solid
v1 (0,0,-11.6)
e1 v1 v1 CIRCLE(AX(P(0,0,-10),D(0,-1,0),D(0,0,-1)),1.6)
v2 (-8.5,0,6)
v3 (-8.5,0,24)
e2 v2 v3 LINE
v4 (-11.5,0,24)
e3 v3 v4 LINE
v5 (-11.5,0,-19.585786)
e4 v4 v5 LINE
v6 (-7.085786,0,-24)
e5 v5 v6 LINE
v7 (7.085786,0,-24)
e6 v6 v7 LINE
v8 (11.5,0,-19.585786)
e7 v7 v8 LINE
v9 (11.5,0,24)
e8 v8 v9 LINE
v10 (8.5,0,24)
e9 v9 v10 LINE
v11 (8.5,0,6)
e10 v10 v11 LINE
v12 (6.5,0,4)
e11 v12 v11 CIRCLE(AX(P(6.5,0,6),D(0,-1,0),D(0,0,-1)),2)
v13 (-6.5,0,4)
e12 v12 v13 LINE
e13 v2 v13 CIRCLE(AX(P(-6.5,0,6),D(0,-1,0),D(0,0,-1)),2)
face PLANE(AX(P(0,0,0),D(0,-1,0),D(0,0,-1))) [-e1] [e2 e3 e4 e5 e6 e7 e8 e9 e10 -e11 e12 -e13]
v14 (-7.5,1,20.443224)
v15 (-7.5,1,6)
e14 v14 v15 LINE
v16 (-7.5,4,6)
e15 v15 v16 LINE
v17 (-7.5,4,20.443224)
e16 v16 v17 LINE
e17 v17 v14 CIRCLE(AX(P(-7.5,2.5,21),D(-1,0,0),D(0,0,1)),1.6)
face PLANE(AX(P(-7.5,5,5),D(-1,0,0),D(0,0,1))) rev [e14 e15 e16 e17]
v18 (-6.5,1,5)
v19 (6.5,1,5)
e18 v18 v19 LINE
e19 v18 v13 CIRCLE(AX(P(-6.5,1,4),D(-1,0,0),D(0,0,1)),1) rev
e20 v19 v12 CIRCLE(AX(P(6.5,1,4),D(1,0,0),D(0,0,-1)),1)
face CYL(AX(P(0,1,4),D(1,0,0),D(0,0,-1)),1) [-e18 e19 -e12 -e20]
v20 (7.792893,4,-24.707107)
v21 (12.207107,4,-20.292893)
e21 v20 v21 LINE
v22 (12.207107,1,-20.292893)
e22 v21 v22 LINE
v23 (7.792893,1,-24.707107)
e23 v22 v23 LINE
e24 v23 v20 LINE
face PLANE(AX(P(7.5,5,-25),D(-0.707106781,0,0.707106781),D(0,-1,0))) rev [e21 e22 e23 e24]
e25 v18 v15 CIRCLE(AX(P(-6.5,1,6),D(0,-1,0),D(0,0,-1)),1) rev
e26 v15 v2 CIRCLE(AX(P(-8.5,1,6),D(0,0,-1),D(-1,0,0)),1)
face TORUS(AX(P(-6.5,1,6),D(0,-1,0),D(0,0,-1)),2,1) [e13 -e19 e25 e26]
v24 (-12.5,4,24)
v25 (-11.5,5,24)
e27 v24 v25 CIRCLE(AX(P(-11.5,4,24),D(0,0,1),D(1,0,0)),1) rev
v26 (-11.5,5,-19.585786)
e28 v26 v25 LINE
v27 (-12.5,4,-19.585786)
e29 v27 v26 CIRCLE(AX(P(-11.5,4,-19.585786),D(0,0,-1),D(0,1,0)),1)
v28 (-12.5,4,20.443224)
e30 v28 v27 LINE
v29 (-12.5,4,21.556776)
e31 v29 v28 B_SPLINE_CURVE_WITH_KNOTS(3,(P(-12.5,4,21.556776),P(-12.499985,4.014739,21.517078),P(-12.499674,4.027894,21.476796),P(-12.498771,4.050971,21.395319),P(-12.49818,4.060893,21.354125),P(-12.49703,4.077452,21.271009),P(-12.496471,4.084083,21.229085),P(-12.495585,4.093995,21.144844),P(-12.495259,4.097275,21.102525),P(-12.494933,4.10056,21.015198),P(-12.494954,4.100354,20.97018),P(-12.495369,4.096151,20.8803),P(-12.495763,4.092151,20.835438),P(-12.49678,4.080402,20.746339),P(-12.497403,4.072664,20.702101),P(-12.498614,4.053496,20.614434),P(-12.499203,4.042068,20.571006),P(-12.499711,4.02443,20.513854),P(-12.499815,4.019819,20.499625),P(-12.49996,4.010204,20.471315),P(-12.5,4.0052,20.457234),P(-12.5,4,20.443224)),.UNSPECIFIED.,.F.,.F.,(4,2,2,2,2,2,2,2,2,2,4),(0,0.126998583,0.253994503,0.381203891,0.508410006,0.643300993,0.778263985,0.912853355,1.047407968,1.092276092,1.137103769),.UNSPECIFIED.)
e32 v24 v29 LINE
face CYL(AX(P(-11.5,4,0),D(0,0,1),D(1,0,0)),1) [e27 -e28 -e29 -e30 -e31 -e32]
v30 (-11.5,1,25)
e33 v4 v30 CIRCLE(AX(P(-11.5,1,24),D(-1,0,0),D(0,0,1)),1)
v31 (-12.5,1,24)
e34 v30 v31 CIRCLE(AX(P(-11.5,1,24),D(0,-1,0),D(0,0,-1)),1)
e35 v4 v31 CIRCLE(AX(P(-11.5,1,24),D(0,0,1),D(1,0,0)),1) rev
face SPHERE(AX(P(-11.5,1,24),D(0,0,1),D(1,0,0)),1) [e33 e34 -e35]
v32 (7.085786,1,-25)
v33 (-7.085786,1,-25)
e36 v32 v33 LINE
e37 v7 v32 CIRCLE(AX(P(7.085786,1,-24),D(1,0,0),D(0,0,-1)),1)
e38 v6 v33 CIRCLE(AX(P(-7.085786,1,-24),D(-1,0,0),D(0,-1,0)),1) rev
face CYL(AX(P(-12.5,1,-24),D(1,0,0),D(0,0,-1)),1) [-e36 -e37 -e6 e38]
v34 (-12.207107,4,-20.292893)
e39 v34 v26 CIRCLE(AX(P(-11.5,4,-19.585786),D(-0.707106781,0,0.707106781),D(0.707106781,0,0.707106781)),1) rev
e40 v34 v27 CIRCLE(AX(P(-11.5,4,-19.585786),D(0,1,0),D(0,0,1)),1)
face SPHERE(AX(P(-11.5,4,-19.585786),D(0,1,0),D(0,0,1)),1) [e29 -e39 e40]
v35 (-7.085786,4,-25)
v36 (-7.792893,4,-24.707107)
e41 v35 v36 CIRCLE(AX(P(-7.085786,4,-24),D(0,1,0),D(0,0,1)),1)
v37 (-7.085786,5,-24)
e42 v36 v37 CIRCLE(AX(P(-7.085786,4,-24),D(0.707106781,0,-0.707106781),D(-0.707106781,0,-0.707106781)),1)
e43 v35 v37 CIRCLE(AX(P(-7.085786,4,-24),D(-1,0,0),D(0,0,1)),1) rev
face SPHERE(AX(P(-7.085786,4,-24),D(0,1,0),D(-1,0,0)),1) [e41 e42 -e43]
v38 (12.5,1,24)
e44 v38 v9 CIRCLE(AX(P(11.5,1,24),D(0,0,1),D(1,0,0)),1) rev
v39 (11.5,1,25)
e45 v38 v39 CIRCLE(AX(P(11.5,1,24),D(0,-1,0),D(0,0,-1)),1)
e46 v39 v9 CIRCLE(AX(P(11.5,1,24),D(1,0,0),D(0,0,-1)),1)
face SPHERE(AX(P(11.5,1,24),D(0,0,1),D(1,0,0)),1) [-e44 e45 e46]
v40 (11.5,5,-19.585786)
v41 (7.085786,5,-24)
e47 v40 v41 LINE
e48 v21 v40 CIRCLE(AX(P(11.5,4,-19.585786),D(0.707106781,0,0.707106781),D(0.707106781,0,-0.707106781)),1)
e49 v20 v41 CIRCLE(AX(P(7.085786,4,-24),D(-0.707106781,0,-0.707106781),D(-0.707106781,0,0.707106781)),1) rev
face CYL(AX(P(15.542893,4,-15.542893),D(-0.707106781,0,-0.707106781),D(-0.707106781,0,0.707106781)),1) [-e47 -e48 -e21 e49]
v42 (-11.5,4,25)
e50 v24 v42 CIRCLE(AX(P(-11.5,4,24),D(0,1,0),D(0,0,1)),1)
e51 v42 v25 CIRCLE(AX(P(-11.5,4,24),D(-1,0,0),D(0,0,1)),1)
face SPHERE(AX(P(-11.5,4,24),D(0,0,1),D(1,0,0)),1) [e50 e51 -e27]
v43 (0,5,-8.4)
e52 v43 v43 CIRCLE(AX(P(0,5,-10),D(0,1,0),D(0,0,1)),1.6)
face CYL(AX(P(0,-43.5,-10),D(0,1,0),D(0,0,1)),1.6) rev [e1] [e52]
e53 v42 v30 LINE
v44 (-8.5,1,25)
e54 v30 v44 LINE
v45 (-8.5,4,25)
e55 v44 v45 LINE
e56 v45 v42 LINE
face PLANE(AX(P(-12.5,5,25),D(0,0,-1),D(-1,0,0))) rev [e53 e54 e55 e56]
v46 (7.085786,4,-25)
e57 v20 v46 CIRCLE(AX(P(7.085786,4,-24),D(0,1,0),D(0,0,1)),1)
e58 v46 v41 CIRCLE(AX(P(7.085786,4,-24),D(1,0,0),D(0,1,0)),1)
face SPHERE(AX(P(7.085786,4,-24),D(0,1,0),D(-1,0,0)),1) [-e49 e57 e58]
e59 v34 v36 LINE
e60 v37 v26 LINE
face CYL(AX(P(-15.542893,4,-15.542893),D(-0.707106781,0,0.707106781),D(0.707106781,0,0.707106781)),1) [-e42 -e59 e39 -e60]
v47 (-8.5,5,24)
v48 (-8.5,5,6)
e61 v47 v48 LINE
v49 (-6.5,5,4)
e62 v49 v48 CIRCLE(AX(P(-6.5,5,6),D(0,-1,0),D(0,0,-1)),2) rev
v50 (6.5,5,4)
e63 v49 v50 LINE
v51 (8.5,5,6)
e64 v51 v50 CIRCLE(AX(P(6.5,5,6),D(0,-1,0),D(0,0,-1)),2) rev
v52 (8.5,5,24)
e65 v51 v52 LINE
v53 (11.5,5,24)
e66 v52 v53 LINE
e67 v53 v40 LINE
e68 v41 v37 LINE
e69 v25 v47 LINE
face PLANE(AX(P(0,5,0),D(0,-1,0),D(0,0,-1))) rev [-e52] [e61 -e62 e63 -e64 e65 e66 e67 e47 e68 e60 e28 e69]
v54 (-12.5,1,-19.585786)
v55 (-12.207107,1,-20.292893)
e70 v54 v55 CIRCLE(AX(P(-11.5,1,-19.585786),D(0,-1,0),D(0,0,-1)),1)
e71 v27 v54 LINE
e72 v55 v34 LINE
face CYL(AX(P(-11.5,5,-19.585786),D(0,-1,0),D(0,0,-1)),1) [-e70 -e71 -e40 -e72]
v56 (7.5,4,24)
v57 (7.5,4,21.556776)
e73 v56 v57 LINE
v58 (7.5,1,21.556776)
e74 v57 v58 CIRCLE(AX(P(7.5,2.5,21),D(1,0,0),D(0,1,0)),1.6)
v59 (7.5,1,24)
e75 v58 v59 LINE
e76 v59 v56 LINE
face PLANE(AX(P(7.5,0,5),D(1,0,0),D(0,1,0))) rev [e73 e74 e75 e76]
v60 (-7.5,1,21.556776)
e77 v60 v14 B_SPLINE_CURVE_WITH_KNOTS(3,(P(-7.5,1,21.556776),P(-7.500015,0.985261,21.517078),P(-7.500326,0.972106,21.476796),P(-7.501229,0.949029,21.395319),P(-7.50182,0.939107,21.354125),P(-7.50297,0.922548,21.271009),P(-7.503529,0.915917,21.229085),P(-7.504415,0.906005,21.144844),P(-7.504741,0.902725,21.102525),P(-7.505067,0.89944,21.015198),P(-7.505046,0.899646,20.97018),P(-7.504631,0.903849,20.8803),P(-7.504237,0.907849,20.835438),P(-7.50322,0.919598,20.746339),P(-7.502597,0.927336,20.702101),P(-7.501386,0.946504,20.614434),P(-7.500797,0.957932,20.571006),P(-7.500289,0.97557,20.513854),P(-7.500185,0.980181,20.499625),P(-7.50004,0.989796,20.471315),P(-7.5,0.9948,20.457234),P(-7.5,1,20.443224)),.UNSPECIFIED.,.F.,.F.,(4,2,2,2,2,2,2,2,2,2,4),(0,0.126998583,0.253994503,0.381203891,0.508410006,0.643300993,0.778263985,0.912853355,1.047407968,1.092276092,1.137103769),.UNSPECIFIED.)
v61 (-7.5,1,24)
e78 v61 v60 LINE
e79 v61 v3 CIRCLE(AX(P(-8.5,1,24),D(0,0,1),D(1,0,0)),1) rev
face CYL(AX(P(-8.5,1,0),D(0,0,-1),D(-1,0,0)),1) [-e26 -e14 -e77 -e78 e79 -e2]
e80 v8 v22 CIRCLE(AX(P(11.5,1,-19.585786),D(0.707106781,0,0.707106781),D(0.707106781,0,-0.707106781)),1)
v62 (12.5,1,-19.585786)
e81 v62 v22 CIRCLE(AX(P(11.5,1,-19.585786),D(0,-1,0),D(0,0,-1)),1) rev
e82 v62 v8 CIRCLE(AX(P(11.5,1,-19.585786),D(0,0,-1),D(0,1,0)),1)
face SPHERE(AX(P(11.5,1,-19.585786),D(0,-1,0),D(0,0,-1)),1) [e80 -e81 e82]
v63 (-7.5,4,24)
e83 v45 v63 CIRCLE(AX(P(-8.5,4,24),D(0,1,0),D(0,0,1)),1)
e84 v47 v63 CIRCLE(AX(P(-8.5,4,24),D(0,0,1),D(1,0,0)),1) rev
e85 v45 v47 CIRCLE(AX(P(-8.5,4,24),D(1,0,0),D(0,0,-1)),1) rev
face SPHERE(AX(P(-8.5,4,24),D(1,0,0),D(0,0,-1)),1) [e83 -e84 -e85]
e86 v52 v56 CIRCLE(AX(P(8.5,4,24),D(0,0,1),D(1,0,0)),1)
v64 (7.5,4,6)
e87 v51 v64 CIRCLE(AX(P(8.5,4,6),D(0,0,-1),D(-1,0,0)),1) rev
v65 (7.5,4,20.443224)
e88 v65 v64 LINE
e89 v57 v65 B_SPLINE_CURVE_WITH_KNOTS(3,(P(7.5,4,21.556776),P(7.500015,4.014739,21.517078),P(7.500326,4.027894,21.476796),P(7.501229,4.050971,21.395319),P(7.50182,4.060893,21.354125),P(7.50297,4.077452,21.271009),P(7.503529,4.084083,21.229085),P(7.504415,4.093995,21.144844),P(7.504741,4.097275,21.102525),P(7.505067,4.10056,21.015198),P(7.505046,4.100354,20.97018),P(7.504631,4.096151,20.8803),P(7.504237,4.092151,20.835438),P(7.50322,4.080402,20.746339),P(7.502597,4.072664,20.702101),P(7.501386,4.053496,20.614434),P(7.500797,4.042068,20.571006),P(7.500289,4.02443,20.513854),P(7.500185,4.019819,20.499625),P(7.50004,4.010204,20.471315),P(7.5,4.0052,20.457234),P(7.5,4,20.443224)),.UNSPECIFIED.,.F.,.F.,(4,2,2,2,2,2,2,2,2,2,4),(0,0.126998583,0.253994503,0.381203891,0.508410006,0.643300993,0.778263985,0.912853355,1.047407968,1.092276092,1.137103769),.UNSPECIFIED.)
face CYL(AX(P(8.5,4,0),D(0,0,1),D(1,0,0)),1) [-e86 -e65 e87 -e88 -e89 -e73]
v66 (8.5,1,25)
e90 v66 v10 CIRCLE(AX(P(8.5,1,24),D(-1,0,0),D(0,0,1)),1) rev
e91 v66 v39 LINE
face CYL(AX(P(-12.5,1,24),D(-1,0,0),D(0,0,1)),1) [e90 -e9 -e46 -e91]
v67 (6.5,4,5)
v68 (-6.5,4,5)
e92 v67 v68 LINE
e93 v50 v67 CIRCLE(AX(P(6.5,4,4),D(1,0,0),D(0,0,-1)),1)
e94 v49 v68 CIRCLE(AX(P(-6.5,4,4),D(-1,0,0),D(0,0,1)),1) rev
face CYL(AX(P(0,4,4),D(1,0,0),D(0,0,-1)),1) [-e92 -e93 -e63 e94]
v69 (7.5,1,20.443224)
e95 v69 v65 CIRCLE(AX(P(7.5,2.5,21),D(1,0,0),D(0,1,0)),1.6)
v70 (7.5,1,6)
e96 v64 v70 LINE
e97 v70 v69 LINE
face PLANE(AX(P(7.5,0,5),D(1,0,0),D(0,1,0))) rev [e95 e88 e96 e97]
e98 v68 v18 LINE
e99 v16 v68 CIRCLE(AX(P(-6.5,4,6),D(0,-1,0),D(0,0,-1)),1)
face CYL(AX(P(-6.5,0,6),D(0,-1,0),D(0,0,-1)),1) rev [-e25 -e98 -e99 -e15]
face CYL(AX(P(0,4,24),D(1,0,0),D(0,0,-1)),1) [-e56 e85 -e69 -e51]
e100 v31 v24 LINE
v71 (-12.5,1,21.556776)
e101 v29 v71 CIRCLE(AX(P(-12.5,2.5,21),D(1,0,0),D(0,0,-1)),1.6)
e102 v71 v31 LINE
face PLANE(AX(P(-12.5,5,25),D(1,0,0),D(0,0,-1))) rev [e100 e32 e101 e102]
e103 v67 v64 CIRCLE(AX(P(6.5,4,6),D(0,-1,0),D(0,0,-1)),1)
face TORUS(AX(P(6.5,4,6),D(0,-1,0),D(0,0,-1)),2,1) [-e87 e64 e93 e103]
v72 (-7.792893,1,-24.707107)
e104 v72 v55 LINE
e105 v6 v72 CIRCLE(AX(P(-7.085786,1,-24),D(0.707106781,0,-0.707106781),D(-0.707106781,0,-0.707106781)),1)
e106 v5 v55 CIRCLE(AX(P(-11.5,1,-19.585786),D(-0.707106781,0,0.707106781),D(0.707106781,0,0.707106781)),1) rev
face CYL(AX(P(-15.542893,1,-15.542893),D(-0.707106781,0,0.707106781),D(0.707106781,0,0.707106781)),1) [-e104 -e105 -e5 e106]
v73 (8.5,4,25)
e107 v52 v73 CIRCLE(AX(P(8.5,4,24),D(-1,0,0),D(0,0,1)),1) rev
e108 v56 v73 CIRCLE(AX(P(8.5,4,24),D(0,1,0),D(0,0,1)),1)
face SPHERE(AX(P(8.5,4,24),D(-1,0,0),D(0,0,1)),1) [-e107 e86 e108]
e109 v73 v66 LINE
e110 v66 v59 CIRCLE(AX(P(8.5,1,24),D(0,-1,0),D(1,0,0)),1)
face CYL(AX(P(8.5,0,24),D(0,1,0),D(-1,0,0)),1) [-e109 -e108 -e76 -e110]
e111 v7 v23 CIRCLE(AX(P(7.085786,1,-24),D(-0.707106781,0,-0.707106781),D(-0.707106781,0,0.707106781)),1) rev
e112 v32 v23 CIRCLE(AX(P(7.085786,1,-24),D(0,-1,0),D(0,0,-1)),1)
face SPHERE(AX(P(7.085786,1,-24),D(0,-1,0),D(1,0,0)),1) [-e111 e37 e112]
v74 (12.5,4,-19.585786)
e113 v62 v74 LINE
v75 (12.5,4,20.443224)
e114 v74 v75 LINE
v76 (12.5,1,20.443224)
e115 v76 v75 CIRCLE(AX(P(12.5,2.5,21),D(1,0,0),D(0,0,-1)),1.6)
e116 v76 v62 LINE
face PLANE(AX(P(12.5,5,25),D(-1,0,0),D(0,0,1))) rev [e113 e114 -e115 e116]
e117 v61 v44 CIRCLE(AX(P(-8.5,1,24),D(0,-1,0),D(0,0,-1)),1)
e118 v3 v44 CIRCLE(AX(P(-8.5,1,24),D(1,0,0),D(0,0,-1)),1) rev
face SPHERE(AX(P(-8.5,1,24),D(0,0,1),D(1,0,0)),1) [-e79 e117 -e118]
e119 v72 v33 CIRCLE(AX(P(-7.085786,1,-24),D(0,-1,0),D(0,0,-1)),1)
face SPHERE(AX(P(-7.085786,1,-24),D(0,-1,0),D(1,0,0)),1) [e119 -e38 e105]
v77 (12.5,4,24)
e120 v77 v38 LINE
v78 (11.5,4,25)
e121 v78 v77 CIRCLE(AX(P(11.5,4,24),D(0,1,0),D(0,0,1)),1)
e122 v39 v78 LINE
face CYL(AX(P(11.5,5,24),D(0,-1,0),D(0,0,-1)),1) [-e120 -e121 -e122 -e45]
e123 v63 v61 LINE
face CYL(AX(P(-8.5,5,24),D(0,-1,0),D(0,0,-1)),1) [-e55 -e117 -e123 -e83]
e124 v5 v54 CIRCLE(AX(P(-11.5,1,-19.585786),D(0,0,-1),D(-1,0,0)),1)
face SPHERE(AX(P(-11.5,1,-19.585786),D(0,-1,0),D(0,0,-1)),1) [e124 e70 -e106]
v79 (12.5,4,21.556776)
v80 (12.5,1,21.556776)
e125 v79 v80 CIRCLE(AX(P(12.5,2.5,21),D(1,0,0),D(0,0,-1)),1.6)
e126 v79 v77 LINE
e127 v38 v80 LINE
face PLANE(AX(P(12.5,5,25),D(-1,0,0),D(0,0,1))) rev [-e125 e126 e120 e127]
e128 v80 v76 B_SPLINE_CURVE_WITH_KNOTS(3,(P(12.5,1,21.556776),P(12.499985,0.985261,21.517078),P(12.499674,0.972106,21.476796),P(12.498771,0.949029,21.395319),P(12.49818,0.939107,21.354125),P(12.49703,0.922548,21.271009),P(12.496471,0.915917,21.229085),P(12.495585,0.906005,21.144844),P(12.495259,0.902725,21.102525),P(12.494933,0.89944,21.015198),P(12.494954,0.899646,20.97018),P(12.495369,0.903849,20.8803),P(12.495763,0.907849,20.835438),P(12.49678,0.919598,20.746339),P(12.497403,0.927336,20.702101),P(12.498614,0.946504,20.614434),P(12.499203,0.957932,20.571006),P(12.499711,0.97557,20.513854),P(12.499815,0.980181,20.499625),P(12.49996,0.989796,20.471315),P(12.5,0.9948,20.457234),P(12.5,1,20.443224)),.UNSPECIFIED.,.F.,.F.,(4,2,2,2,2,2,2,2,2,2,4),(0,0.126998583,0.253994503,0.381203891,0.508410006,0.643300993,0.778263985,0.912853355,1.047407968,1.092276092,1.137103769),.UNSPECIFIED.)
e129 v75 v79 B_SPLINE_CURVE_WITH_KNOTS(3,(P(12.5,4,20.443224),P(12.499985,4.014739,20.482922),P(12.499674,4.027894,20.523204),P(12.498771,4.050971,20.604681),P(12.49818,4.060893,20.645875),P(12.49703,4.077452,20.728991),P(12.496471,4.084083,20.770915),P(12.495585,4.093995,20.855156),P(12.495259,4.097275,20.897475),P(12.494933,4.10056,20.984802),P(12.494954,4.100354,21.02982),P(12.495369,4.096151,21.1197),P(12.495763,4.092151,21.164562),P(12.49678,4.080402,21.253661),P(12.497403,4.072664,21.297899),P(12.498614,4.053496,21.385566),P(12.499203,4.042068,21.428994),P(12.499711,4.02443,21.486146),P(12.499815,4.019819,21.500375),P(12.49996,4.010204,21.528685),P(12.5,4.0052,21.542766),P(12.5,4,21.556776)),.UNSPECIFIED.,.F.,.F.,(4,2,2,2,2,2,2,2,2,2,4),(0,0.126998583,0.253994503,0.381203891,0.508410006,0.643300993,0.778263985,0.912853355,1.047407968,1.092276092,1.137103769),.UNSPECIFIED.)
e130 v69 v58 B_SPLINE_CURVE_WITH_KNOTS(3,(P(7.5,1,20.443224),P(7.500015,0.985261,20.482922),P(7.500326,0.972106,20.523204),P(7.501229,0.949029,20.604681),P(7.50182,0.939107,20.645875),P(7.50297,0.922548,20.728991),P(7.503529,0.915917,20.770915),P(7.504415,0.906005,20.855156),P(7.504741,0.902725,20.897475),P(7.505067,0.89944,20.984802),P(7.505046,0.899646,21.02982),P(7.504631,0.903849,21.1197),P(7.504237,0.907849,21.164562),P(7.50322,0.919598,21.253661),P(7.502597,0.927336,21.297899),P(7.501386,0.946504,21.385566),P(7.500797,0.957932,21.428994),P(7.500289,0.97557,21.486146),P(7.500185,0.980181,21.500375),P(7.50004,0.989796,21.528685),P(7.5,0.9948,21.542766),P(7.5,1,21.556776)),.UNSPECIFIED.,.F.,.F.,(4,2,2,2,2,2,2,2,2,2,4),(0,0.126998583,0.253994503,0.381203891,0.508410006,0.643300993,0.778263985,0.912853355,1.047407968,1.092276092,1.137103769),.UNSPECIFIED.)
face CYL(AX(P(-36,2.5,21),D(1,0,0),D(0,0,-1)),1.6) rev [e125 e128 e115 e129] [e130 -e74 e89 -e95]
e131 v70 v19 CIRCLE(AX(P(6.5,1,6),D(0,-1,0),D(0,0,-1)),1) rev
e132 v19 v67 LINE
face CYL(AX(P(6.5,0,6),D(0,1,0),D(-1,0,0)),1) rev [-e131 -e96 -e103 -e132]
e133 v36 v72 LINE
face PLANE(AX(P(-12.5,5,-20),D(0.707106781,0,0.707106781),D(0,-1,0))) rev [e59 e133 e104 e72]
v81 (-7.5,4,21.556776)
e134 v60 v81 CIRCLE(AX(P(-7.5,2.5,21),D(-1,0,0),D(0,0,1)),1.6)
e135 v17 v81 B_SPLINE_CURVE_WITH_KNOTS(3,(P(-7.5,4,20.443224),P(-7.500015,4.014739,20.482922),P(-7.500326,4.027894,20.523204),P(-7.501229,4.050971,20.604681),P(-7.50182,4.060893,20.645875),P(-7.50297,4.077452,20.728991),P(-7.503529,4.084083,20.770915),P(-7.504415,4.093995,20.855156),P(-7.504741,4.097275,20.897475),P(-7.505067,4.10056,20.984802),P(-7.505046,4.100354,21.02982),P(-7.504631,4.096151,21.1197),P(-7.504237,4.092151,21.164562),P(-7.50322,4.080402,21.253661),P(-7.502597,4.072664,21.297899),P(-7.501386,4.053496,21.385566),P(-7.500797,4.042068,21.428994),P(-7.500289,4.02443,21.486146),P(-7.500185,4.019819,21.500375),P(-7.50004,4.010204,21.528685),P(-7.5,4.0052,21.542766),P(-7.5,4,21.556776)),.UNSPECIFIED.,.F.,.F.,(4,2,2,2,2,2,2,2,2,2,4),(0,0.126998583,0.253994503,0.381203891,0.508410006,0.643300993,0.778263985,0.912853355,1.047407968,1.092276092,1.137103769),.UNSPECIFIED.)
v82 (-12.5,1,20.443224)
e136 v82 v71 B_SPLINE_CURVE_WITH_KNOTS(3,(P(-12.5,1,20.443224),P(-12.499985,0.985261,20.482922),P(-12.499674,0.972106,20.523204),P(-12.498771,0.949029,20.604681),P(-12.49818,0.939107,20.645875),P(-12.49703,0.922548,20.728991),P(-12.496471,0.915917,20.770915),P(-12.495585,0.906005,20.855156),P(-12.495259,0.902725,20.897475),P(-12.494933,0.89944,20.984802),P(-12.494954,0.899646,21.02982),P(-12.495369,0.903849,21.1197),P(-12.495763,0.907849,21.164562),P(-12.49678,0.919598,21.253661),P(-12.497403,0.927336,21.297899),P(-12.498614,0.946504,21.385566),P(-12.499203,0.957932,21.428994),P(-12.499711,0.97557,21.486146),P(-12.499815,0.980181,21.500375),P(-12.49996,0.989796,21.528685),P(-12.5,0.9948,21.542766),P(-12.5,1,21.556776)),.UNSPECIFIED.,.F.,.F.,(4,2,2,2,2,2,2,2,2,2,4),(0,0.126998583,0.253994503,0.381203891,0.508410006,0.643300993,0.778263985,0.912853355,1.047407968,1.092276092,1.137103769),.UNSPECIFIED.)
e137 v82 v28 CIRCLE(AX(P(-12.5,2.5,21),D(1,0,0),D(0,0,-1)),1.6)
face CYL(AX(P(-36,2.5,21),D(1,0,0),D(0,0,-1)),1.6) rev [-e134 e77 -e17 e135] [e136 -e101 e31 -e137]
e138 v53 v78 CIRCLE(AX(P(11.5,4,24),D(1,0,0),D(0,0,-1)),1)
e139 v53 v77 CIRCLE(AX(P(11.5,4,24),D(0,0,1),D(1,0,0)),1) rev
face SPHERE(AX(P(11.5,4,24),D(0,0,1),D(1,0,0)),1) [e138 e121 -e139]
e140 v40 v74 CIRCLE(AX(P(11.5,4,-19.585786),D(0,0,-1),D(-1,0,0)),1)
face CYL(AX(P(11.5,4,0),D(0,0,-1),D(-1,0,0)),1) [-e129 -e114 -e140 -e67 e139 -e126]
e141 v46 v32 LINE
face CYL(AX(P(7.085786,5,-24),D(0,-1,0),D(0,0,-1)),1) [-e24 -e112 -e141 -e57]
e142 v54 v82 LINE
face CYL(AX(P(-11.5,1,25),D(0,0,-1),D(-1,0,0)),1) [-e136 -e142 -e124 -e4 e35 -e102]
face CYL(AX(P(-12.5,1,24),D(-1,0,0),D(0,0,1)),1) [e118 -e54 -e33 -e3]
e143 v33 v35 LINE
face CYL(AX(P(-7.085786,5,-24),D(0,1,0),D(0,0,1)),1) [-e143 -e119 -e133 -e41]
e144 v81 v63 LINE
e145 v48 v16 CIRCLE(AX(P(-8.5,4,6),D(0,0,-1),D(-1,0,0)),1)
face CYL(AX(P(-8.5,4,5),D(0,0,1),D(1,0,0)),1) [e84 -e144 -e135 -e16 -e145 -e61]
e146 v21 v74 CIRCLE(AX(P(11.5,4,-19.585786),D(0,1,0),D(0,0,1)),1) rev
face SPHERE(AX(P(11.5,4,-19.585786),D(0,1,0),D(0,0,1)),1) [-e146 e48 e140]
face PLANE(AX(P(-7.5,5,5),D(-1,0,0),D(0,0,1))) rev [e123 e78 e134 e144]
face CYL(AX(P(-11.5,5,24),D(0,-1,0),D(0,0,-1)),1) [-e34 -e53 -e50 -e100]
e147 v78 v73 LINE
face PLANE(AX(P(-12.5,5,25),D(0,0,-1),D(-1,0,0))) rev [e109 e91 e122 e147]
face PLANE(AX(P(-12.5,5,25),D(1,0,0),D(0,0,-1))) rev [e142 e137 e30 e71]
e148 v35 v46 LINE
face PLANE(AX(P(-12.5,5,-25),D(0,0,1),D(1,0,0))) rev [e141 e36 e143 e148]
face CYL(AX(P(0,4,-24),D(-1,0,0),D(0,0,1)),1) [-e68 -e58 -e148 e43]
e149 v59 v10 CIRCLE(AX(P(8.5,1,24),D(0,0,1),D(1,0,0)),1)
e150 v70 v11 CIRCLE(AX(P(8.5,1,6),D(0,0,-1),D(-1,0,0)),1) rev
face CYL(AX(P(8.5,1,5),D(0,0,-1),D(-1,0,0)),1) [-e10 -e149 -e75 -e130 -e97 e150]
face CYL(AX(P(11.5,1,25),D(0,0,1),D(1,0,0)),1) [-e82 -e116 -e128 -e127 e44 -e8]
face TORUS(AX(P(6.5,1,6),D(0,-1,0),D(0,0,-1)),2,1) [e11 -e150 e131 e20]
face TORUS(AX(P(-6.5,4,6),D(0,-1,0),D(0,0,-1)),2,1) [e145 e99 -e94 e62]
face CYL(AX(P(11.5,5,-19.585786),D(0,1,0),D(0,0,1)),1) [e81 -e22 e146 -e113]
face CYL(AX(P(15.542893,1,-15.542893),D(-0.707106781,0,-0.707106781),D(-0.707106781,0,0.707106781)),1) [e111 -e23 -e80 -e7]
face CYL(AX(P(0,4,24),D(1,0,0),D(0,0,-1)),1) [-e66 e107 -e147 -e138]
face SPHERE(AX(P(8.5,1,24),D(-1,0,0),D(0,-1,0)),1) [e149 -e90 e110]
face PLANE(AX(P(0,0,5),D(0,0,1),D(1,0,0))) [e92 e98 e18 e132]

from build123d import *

# Parameters (mm, degrees)
SKETCH1_W           = 25
SKETCH1_H           = 50
BOSS_EXTRUDE1_DEPTH = 5
SKETCH3_W           = 15
SKETCH3_H           = 5
CUT_EXTRUDE1_DEPTH  = 20
SKETCH5_R           = 1.6
CUT_EXTRUDE4_DEPTH  = 48.5
SKETCH6_R           = 1.6
CUT_EXTRUDE5_DEPTH  = 48.5
CHAMFER1_SIZE       = 5
FILLET1_R           = 1


with BuildPart() as part:
    # Sketch1 → Boss-Extrude1 (new body)
    with BuildSketch(Plane(origin=(0, 0, 0), x_dir=(1, 0, 0), z_dir=(0, 1, 0))):
        Rectangle(SKETCH1_W, SKETCH1_H)
    extrude(amount=BOSS_EXTRUDE1_DEPTH)

    # Sketch3 → Cut-Extrude1 (cut)
    with BuildSketch(Plane.XY.offset(25)):
        with Locations((0, 2.5)):
            Rectangle(SKETCH3_W, SKETCH3_H)
    extrude(amount=-CUT_EXTRUDE1_DEPTH, mode=Mode.SUBTRACT)

    # Sketch5 → Cut-Extrude4 (cut)
    with BuildSketch(Plane(origin=(12.5, 0, 0), x_dir=(0, 0, -1), z_dir=(1, 0, 0))):
        with Locations((-21, 2.5)):
            Circle(SKETCH5_R)
    extrude(amount=-CUT_EXTRUDE4_DEPTH, mode=Mode.SUBTRACT)

    # Sketch6 → Cut-Extrude5 (cut)
    with BuildSketch(Plane(origin=(0, 5, 0), x_dir=(1, 0, 0), z_dir=(0, 1, 0))):
        with Locations(Location((0, 10, 0), (0, 0, 270))):
            Circle(SKETCH6_R)
    extrude(amount=-CUT_EXTRUDE5_DEPTH, mode=Mode.SUBTRACT)

    # Chamfer1
    chamfer1_edges = [part.edges().sort_by_distance(p)[0] for p in [
        (-12.5, 2.5, -25),
        (12.5, 2.5, -25),
    ]]
    chamfer(chamfer1_edges, length=CHAMFER1_SIZE)

    # Fillet1
    # the kernel refuses this fillet: 1 mm, written as the material it adds along each edge
    with BuildSketch(Plane(origin=(7.5, 0, 5), x_dir=(-1, 0, 0), z_dir=(0, 1, 0))) as fillet1_piece_1:
        with BuildLine():
            CenterArc((FILLET1_R, FILLET1_R), FILLET1_R, 180, 90)
            Line((0, FILLET1_R), (0, 0))
            Line((0, 0), (FILLET1_R, 0))
        make_face()
    extrude(amount=5)
    with BuildSketch(Plane(origin=(-7.5, 5, 5), x_dir=(0, 0, 1), z_dir=(0, -1, 0))) as fillet1_piece_2:
        with BuildLine():
            CenterArc((FILLET1_R, -FILLET1_R), FILLET1_R, 90, 90)
            Line((0, -FILLET1_R), (0, 0))
            Line((0, 0), (FILLET1_R, 0))
        make_face()
    extrude(amount=5)
    # the kernel refuses this fillet: 1 mm, written as the material it takes off along each edge
    with BuildSketch(Plane(origin=(11.5, 1, 24), x_dir=(1, 0, 0), z_dir=(0, -1, 0))) as fillet1_2_piece_1_section:
        Polygon((0, 0), (FILLET1_R, 0), (FILLET1_R, FILLET1_R), (0, FILLET1_R), align=None)
    fillet1_2_piece_1 = extrude(amount=FILLET1_R, mode=Mode.PRIVATE)
    fillet1_2_piece_1 = fillet1_2_piece_1 - Plane(origin=(11.5, 1, 24), x_dir=(-0.7071067811865475, 0, -0.7071067811865475), z_dir=(0, -1, 0)) * Sphere(FILLET1_R, mode=Mode.PRIVATE)
    add(fillet1_2_piece_1, mode=Mode.SUBTRACT)
    with BuildSketch(Plane(origin=(-11.5, 4, 24), x_dir=(0, 0, 1), z_dir=(-1, 0, 0))) as fillet1_2_piece_2_section:
        Polygon((0, 0), (FILLET1_R, 0), (FILLET1_R, FILLET1_R), (0, FILLET1_R), align=None)
    fillet1_2_piece_2 = extrude(amount=FILLET1_R, mode=Mode.PRIVATE)
    fillet1_2_piece_2 = fillet1_2_piece_2 - Plane(origin=(-11.5, 4, 24), x_dir=(0, -0.7071067811865475, -0.7071067811865475), z_dir=(-1, 0, 0)) * Sphere(FILLET1_R, mode=Mode.PRIVATE)
    add(fillet1_2_piece_2, mode=Mode.SUBTRACT)
    with BuildSketch(Plane(origin=(11.5, 4, 24), x_dir=(0, 0, 1), z_dir=(1, 0, 0))) as fillet1_2_piece_3_section:
        Polygon((0, 0), (FILLET1_R, 0), (FILLET1_R, -FILLET1_R), (0, -FILLET1_R), align=None)
    fillet1_2_piece_3 = extrude(amount=FILLET1_R, mode=Mode.PRIVATE)
    fillet1_2_piece_3 = fillet1_2_piece_3 - Plane(origin=(11.5, 4, 24), x_dir=(0, -0.7071067811865475, -0.7071067811865475), z_dir=(1, 0, 0)) * Sphere(FILLET1_R, mode=Mode.PRIVATE)
    add(fillet1_2_piece_3, mode=Mode.SUBTRACT)
    with BuildSketch(Plane(origin=(-11.5, 1, -19.585786438), x_dir=(-1, 0, 0), z_dir=(0, -1, 0))) as fillet1_2_piece_4_section:
        Polygon((0, 0), (FILLET1_R, 0), (FILLET1_R, FILLET1_R * 0.414213562373), (FILLET1_R * 0.707106781187, FILLET1_R * 0.707106781187), align=None)
    fillet1_2_piece_4 = extrude(amount=FILLET1_R, mode=Mode.PRIVATE)
    fillet1_2_piece_4 = fillet1_2_piece_4 - Plane(origin=(-11.5, 1, -19.585786438), x_dir=(0.9238795325112867, 0, 0.3826834323650898), z_dir=(0, -1, 0)) * Sphere(FILLET1_R, mode=Mode.PRIVATE)
    add(fillet1_2_piece_4, mode=Mode.SUBTRACT)
    with BuildSketch(Plane(origin=(-11.5, 1, 24), x_dir=(-1, 0, 0), z_dir=(0, -1, 0))) as fillet1_2_piece_5_section:
        Polygon((0, 0), (FILLET1_R, 0), (FILLET1_R, -FILLET1_R), (0, -FILLET1_R), align=None)
    fillet1_2_piece_5 = extrude(amount=FILLET1_R, mode=Mode.PRIVATE)
    fillet1_2_piece_5 = fillet1_2_piece_5 - Plane(origin=(-11.5, 1, 24), x_dir=(0.7071067811865475, 0, -0.7071067811865475), z_dir=(0, -1, 0)) * Sphere(FILLET1_R, mode=Mode.PRIVATE)
    add(fillet1_2_piece_5, mode=Mode.SUBTRACT)
    with BuildSketch(Plane(origin=(-11.5, 4, -19.585786438), x_dir=(-1, 0, 0), z_dir=(0, 1, 0))) as fillet1_2_piece_6_section:
        Polygon((0, 0), (FILLET1_R, 0), (FILLET1_R, -FILLET1_R * 0.414213562373), (FILLET1_R * 0.707106781187, -FILLET1_R * 0.707106781187), align=None)
    fillet1_2_piece_6 = extrude(amount=FILLET1_R, mode=Mode.PRIVATE)
    fillet1_2_piece_6 = fillet1_2_piece_6 - Plane(origin=(-11.5, 4, -19.585786438), x_dir=(0.9238795325112867, 0, 0.3826834323650898), z_dir=(0, 1, 0)) * Sphere(FILLET1_R, mode=Mode.PRIVATE)
    add(fillet1_2_piece_6, mode=Mode.SUBTRACT)
    with BuildSketch(Plane(origin=(7.085786438, 1, -24), x_dir=(0, 0, -1), z_dir=(0, -1, 0))) as fillet1_2_piece_7_section:
        Polygon((0, 0), (FILLET1_R, 0), (FILLET1_R, FILLET1_R * 0.414213562373), (FILLET1_R * 0.707106781187, FILLET1_R * 0.707106781187), align=None)
    fillet1_2_piece_7 = extrude(amount=FILLET1_R, mode=Mode.PRIVATE)
    fillet1_2_piece_7 = fillet1_2_piece_7 - Plane(origin=(7.085786438, 1, -24), x_dir=(-0.3826834323650898, 0, 0.9238795325112867), z_dir=(0, -1, 0)) * Sphere(FILLET1_R, mode=Mode.PRIVATE)
    add(fillet1_2_piece_7, mode=Mode.SUBTRACT)
    with BuildSketch(Plane(origin=(-7.085786438, 1, -24), x_dir=(-0.7071067811865476, 0, -0.7071067811865476), z_dir=(0, -1, 0))) as fillet1_2_piece_8_section:
        Polygon((0, 0), (FILLET1_R, 0), (FILLET1_R, FILLET1_R * 0.414213562373), (FILLET1_R * 0.707106781187, FILLET1_R * 0.707106781187), align=None)
    fillet1_2_piece_8 = extrude(amount=FILLET1_R, mode=Mode.PRIVATE)
    fillet1_2_piece_8 = fillet1_2_piece_8 - Plane(origin=(-7.085786438, 1, -24), x_dir=(0.3826834323650898, 0, 0.9238795325112867), z_dir=(0, -1, 0)) * Sphere(FILLET1_R, mode=Mode.PRIVATE)
    add(fillet1_2_piece_8, mode=Mode.SUBTRACT)
    with BuildSketch(Plane(origin=(11.5, 4, -19.585786438), x_dir=(0.7071067811865476, 0, -0.7071067811865476), z_dir=(0, 1, 0))) as fillet1_2_piece_9_section:
        Polygon((0, 0), (FILLET1_R, 0), (FILLET1_R, -FILLET1_R * 0.414213562373), (FILLET1_R * 0.707106781187, -FILLET1_R * 0.707106781187), align=None)
    fillet1_2_piece_9 = extrude(amount=FILLET1_R, mode=Mode.PRIVATE)
    fillet1_2_piece_9 = fillet1_2_piece_9 - Plane(origin=(11.5, 4, -19.585786438), x_dir=(-0.9238795325112867, 0, 0.3826834323650898), z_dir=(0, 1, 0)) * Sphere(FILLET1_R, mode=Mode.PRIVATE)
    add(fillet1_2_piece_9, mode=Mode.SUBTRACT)
    with BuildSketch(Plane(origin=(11.5, 1, -19.585786438), x_dir=(1, 0, 0), z_dir=(0, -1, 0))) as fillet1_2_piece_10_section:
        Polygon((0, 0), (FILLET1_R, 0), (FILLET1_R, -FILLET1_R * 0.414213562373), (FILLET1_R * 0.707106781187, -FILLET1_R * 0.707106781187), align=None)
    fillet1_2_piece_10 = extrude(amount=FILLET1_R, mode=Mode.PRIVATE)
    fillet1_2_piece_10 = fillet1_2_piece_10 - Plane(origin=(11.5, 1, -19.585786438), x_dir=(-0.9238795325112867, 0, 0.3826834323650898), z_dir=(0, -1, 0)) * Sphere(FILLET1_R, mode=Mode.PRIVATE)
    add(fillet1_2_piece_10, mode=Mode.SUBTRACT)
    with BuildSketch(Plane(origin=(7.085786438, 4, -24), x_dir=(0.7071067811865476, 0, -0.7071067811865476), z_dir=(0, 1, 0))) as fillet1_2_piece_11_section:
        Polygon((0, 0), (FILLET1_R, 0), (FILLET1_R, FILLET1_R * 0.414213562373), (FILLET1_R * 0.707106781187, FILLET1_R * 0.707106781187), align=None)
    fillet1_2_piece_11 = extrude(amount=FILLET1_R, mode=Mode.PRIVATE)
    fillet1_2_piece_11 = fillet1_2_piece_11 - Plane(origin=(7.085786438, 4, -24), x_dir=(-0.3826834323650898, 0, 0.9238795325112867), z_dir=(0, 1, 0)) * Sphere(FILLET1_R, mode=Mode.PRIVATE)
    add(fillet1_2_piece_11, mode=Mode.SUBTRACT)
    with BuildSketch(Plane(origin=(-7.085786438, 4, -24), x_dir=(-0.7071067811865476, 0, -0.7071067811865476), z_dir=(0, 1, 0))) as fillet1_2_piece_12_section:
        Polygon((0, 0), (FILLET1_R, 0), (FILLET1_R, -FILLET1_R * 0.414213562373), (FILLET1_R * 0.707106781187, -FILLET1_R * 0.707106781187), align=None)
    fillet1_2_piece_12 = extrude(amount=FILLET1_R, mode=Mode.PRIVATE)
    fillet1_2_piece_12 = fillet1_2_piece_12 - Plane(origin=(-7.085786438, 4, -24), x_dir=(0.3826834323650898, 0, 0.9238795325112867), z_dir=(0, 1, 0)) * Sphere(FILLET1_R, mode=Mode.PRIVATE)
    add(fillet1_2_piece_12, mode=Mode.SUBTRACT)
    with BuildSketch(Plane(origin=(5, 0, 25), x_dir=(0, 0, -1), z_dir=(1, 0, 0)), Plane(origin=(-11.5, 5, 25), x_dir=(0, -1, 0), z_dir=(1, 0, 0)), Plane(origin=(5, 5, 25), x_dir=(0, -1, 0), z_dir=(1, 0, 0)), Plane(origin=(-11.5, 0, 25), x_dir=(0, 0, -1), z_dir=(1, 0, 0))) as fillet1_2_piece_13:
        with BuildLine():
            CenterArc((FILLET1_R, FILLET1_R), FILLET1_R, 180, 90)
            Line((0, FILLET1_R), (0, 0))
            Line((0, 0), (FILLET1_R, 0))
        make_face()
    extrude(amount=6.5, mode=Mode.SUBTRACT)
    with BuildSketch(Plane(origin=(-7.5, 7.5, 25), x_dir=(-1, 0, 0), z_dir=(0, -1, 0))) as fillet1_2_piece_14:
        with BuildLine():
            CenterArc((FILLET1_R, FILLET1_R), FILLET1_R, 180, 90)
            Line((0, FILLET1_R), (0, 0))
            Line((0, 0), (FILLET1_R, 0))
        make_face()
    extrude(amount=10, mode=Mode.SUBTRACT)
    with BuildSketch(Plane(origin=(7.5, -2.5, 25), x_dir=(0, 0, -1), z_dir=(0, 1, 0))) as fillet1_2_piece_15:
        with BuildLine():
            CenterArc((FILLET1_R, -FILLET1_R), FILLET1_R, 90, 90)
            Line((0, -FILLET1_R), (0, 0))
            Line((0, 0), (FILLET1_R, 0))
        make_face()
    extrude(amount=10, mode=Mode.SUBTRACT)
    with BuildSketch(Plane(origin=(-12.5, 0, -19.585786438), x_dir=(1, 0, 0), z_dir=(0, 0, 1)), Plane(origin=(-12.5, 5, -19.585786438), x_dir=(0, -1, 0), z_dir=(0, 0, 1)), Plane(origin=(12.5, 5, 24), x_dir=(0, -1, 0), z_dir=(0, 0, -1)), Plane(origin=(12.5, 0, 24), x_dir=(-1, 0, 0), z_dir=(0, 0, -1))) as fillet1_2_piece_16:
        with BuildLine():
            CenterArc((FILLET1_R, FILLET1_R), FILLET1_R, 180, 90)
            Line((0, FILLET1_R), (0, 0))
            Line((0, 0), (FILLET1_R, 0))
        make_face()
    extrude(amount=43.585786438, mode=Mode.SUBTRACT)
    with BuildSketch(Plane(origin=(-12.5, 1, -20), x_dir=(0, 0, 1), z_dir=(0, 1, 0)), Plane(origin=(7.5, 1, -25), x_dir=(-1, 0, 0), z_dir=(0, 1, 0)), Plane(origin=(-7.5, 1, -25), x_dir=(-0.7071067811865486, 0, 0.7071067811865465), z_dir=(0, 1, 0)), Plane(origin=(12.5, 1, -20), x_dir=(-0.7071067811865475, 0, -0.7071067811865475), z_dir=(0, 1, 0))) as fillet1_2_piece_17:
        with BuildLine():
            CenterArc((FILLET1_R * 0.414213562373, FILLET1_R), FILLET1_R, 225, 45)
            Line((-FILLET1_R * 0.292893218813, FILLET1_R * 0.292893218813), (0, 0))
            Line((0, 0), (FILLET1_R * 0.414213562373, 0))
        make_face()
    extrude(amount=3, mode=Mode.SUBTRACT)
    with BuildSketch(Plane(origin=(7.085786438, 0, -25), x_dir=(0, 0, 1), z_dir=(-1, 0, 0)), Plane(origin=(7.085786438, 5, -25), x_dir=(0, -1, 0), z_dir=(-1, 0, 0))) as fillet1_2_piece_18:
        with BuildLine():
            CenterArc((FILLET1_R, FILLET1_R), FILLET1_R, 180, 90)
            Line((0, FILLET1_R), (0, 0))
            Line((0, 0), (FILLET1_R, 0))
        make_face()
    extrude(amount=14.171572875, mode=Mode.SUBTRACT)
    with BuildSketch(Plane(origin=(7.792893219, 0, -24.707106781), x_dir=(-0.7071067811865475, 0, 0.7071067811865475), z_dir=(0.7071067811865476, 0, 0.7071067811865476)), Plane(origin=(-12.207106781, 0, -20.292893219), x_dir=(0.7071067811865476, 0, 0.7071067811865476), z_dir=(0.7071067811865476, 0, -0.7071067811865476)), Plane(origin=(7.792893219, 5, -24.707106781), x_dir=(0, -1, 0), z_dir=(0.7071067811865476, 0, 0.7071067811865476)), Plane(origin=(-12.207106781, 5, -20.292893219), x_dir=(0, -1, 0), z_dir=(0.7071067811865476, 0, -0.7071067811865476))) as fillet1_2_piece_19:
        with BuildLine():
            CenterArc((FILLET1_R, -FILLET1_R), FILLET1_R, 90, 90)
            Line((0, -FILLET1_R), (0, 0))
            Line((0, 0), (FILLET1_R, 0))
        make_face()
    extrude(amount=6.242640687, mode=Mode.SUBTRACT)
    with BuildSketch(Plane(origin=(12.5, 1, 25), x_dir=(0, 0, -1), z_dir=(0, 1, 0))) as fillet1_2_piece_20:
        with BuildLine():
            CenterArc((FILLET1_R, FILLET1_R), FILLET1_R, 180, 90)
            Line((0, FILLET1_R), (0, 0))
            Line((0, 0), (FILLET1_R, 0))
        make_face()
    extrude(amount=3, mode=Mode.SUBTRACT)
    with BuildSketch(Plane(origin=(-12.5, 1, 25), x_dir=(0, 0, -1), z_dir=(0, 1, 0))) as fillet1_2_piece_21:
        with BuildLine():
            CenterArc((FILLET1_R, -FILLET1_R), FILLET1_R, 90, 90)
            Line((0, -FILLET1_R), (0, 0))
            Line((0, 0), (FILLET1_R, 0))
        make_face()
    extrude(amount=3, mode=Mode.SUBTRACT)
    # the kernel refuses this fillet: 1 mm, written as the material it takes off along each edge
    with BuildSketch(Plane(origin=(-8.5, 1, 24), x_dir=(1, 0, 0), z_dir=(0, -1, 0))) as fillet1_3_piece_1_section:
        Polygon((0, 0), (FILLET1_R, 0), (FILLET1_R, FILLET1_R), (0, FILLET1_R), align=None)
    fillet1_3_piece_1 = extrude(amount=FILLET1_R, mode=Mode.PRIVATE)
    fillet1_3_piece_1 = fillet1_3_piece_1 - Plane(origin=(-8.5, 1, 24), x_dir=(-0.7071067811865475, 0, -0.7071067811865475), z_dir=(0, -1, 0)) * Sphere(FILLET1_R, mode=Mode.PRIVATE)
    add(fillet1_3_piece_1, mode=Mode.SUBTRACT)
    with BuildSketch(Plane(origin=(8.5, 1, 24), x_dir=(-1, 0, 0), z_dir=(0, -1, 0))) as fillet1_3_piece_2_section:
        Polygon((0, 0), (FILLET1_R, 0), (FILLET1_R, -FILLET1_R), (0, -FILLET1_R), align=None)
    fillet1_3_piece_2 = extrude(amount=FILLET1_R, mode=Mode.PRIVATE)
    fillet1_3_piece_2 = fillet1_3_piece_2 - Plane(origin=(8.5, 1, 24), x_dir=(0.7071067811865475, 0, -0.7071067811865475), z_dir=(0, -1, 0)) * Sphere(FILLET1_R, mode=Mode.PRIVATE)
    add(fillet1_3_piece_2, mode=Mode.SUBTRACT)
    with BuildSketch(Plane(origin=(8.5, 4, 24), x_dir=(0, 1, 0), z_dir=(-1, 0, 0))) as fillet1_3_piece_3_section:
        Polygon((0, 0), (FILLET1_R, 0), (FILLET1_R, -FILLET1_R), (0, -FILLET1_R), align=None)
    fillet1_3_piece_3 = extrude(amount=FILLET1_R, mode=Mode.PRIVATE)
    fillet1_3_piece_3 = fillet1_3_piece_3 - Plane(origin=(8.5, 4, 24), x_dir=(0, -0.7071067811865475, -0.7071067811865475), z_dir=(-1, 0, 0)) * Sphere(FILLET1_R, mode=Mode.PRIVATE)
    add(fillet1_3_piece_3, mode=Mode.SUBTRACT)
    with BuildSketch(Plane(origin=(-8.5, 4, 24), x_dir=(0, 1, 0), z_dir=(1, 0, 0))) as fillet1_3_piece_4_section:
        Polygon((0, 0), (FILLET1_R, 0), (FILLET1_R, FILLET1_R), (0, FILLET1_R), align=None)
    fillet1_3_piece_4 = extrude(amount=FILLET1_R, mode=Mode.PRIVATE)
    fillet1_3_piece_4 = fillet1_3_piece_4 - Plane(origin=(-8.5, 4, 24), x_dir=(0, -0.7071067811865475, -0.7071067811865475), z_dir=(1, 0, 0)) * Sphere(FILLET1_R, mode=Mode.PRIVATE)
    add(fillet1_3_piece_4, mode=Mode.SUBTRACT)
    with BuildSketch(Plane(origin=(6.5, 5, 5), x_dir=(0, -1, 0), z_dir=(-1, 0, 0))) as fillet1_3_piece_5:
        with BuildLine():
            CenterArc((FILLET1_R, -FILLET1_R), FILLET1_R, 90, 90)
            Line((0, -FILLET1_R), (0, 0))
            Line((0, 0), (FILLET1_R, 0))
        make_face()
    extrude(amount=13, mode=Mode.SUBTRACT)
    with BuildSketch(Plane(origin=(-7.5, 5, 24), x_dir=(0, -1, 0), z_dir=(0, 0, -1)), Plane(origin=(-7.5, 0, 24), x_dir=(-1, 0, 0), z_dir=(0, 0, -1))) as fillet1_3_piece_6:
        with BuildLine():
            CenterArc((FILLET1_R, FILLET1_R), FILLET1_R, 180, 90)
            Line((0, FILLET1_R), (0, 0))
            Line((0, 0), (FILLET1_R, 0))
        make_face()
    extrude(amount=18, mode=Mode.SUBTRACT)
    with BuildSketch(Plane(origin=(7.5, 5, 24), x_dir=(0, -1, 0), z_dir=(0, 0, -1)), Plane(origin=(7.5, 0, 24), x_dir=(1, 0, 0), z_dir=(0, 0, -1))) as fillet1_3_piece_7:
        with BuildLine():
            CenterArc((FILLET1_R, -FILLET1_R), FILLET1_R, 90, 90)
            Line((0, -FILLET1_R), (0, 0))
            Line((0, 0), (FILLET1_R, 0))
        make_face()
    extrude(amount=18, mode=Mode.SUBTRACT)
    with BuildSketch(Plane(origin=(-6.5, 0, 5), x_dir=(0, 0, -1), z_dir=(1, 0, 0))) as fillet1_3_piece_8:
        with BuildLine():
            CenterArc((FILLET1_R, FILLET1_R), FILLET1_R, 180, 90)
            Line((0, FILLET1_R), (0, 0))
            Line((0, 0), (FILLET1_R, 0))
        make_face()
    extrude(amount=13, mode=Mode.SUBTRACT)
    with BuildSketch(Plane(origin=(-6.5, 0, 6), x_dir=(-1, 0, 0), z_dir=(0, 0, 1))) as fillet1_3_piece_9:
        with BuildLine():
            CenterArc((1 + FILLET1_R, -FILLET1_R), FILLET1_R, 90, 90)
            Line((1, -FILLET1_R), (1, 0))
            Line((1, 0), (1 + FILLET1_R, 0))
        make_face()
    revolve(axis=Axis((-6.5, 0, 6), (0, -1, 0)), revolution_arc=90, mode=Mode.SUBTRACT)
    with BuildSketch(Plane(origin=(6.5, 0, 6), x_dir=(0, 0, -1), z_dir=(-1, 0, 0))) as fillet1_3_piece_10:
        with BuildLine():
            CenterArc((1 + FILLET1_R, -FILLET1_R), FILLET1_R, 90, 90)
            Line((1, -FILLET1_R), (1, 0))
            Line((1, 0), (1 + FILLET1_R, 0))
        make_face()
    revolve(axis=Axis((6.5, 0, 6), (0, -1, 0)), revolution_arc=90, mode=Mode.SUBTRACT)
    with BuildSketch(Plane(origin=(6.5, 5, 6), x_dir=(0, 0, -1), z_dir=(-1, 0, 0))) as fillet1_3_piece_11:
        with BuildLine():
            CenterArc((1 + FILLET1_R, FILLET1_R), FILLET1_R, 180, 90)
            Line((1 + FILLET1_R, 0), (1, 0))
            Line((1, 0), (1, FILLET1_R))
        make_face()
    revolve(axis=Axis((6.5, 5, 6), (0, -1, 0)), revolution_arc=90, mode=Mode.SUBTRACT)
    with BuildSketch(Plane(origin=(-6.5, 5, 6), x_dir=(-1, 0, 0), z_dir=(0, 0, 1))) as fillet1_3_piece_12:
        with BuildLine():
            CenterArc((1 + FILLET1_R, FILLET1_R), FILLET1_R, 180, 90)
            Line((1 + FILLET1_R, 0), (1, 0))
            Line((1, 0), (1, FILLET1_R))
        make_face()
    revolve(axis=Axis((-6.5, 5, 6), (0, -1, 0)), revolution_arc=90, mode=Mode.SUBTRACT)


solid = part.part
